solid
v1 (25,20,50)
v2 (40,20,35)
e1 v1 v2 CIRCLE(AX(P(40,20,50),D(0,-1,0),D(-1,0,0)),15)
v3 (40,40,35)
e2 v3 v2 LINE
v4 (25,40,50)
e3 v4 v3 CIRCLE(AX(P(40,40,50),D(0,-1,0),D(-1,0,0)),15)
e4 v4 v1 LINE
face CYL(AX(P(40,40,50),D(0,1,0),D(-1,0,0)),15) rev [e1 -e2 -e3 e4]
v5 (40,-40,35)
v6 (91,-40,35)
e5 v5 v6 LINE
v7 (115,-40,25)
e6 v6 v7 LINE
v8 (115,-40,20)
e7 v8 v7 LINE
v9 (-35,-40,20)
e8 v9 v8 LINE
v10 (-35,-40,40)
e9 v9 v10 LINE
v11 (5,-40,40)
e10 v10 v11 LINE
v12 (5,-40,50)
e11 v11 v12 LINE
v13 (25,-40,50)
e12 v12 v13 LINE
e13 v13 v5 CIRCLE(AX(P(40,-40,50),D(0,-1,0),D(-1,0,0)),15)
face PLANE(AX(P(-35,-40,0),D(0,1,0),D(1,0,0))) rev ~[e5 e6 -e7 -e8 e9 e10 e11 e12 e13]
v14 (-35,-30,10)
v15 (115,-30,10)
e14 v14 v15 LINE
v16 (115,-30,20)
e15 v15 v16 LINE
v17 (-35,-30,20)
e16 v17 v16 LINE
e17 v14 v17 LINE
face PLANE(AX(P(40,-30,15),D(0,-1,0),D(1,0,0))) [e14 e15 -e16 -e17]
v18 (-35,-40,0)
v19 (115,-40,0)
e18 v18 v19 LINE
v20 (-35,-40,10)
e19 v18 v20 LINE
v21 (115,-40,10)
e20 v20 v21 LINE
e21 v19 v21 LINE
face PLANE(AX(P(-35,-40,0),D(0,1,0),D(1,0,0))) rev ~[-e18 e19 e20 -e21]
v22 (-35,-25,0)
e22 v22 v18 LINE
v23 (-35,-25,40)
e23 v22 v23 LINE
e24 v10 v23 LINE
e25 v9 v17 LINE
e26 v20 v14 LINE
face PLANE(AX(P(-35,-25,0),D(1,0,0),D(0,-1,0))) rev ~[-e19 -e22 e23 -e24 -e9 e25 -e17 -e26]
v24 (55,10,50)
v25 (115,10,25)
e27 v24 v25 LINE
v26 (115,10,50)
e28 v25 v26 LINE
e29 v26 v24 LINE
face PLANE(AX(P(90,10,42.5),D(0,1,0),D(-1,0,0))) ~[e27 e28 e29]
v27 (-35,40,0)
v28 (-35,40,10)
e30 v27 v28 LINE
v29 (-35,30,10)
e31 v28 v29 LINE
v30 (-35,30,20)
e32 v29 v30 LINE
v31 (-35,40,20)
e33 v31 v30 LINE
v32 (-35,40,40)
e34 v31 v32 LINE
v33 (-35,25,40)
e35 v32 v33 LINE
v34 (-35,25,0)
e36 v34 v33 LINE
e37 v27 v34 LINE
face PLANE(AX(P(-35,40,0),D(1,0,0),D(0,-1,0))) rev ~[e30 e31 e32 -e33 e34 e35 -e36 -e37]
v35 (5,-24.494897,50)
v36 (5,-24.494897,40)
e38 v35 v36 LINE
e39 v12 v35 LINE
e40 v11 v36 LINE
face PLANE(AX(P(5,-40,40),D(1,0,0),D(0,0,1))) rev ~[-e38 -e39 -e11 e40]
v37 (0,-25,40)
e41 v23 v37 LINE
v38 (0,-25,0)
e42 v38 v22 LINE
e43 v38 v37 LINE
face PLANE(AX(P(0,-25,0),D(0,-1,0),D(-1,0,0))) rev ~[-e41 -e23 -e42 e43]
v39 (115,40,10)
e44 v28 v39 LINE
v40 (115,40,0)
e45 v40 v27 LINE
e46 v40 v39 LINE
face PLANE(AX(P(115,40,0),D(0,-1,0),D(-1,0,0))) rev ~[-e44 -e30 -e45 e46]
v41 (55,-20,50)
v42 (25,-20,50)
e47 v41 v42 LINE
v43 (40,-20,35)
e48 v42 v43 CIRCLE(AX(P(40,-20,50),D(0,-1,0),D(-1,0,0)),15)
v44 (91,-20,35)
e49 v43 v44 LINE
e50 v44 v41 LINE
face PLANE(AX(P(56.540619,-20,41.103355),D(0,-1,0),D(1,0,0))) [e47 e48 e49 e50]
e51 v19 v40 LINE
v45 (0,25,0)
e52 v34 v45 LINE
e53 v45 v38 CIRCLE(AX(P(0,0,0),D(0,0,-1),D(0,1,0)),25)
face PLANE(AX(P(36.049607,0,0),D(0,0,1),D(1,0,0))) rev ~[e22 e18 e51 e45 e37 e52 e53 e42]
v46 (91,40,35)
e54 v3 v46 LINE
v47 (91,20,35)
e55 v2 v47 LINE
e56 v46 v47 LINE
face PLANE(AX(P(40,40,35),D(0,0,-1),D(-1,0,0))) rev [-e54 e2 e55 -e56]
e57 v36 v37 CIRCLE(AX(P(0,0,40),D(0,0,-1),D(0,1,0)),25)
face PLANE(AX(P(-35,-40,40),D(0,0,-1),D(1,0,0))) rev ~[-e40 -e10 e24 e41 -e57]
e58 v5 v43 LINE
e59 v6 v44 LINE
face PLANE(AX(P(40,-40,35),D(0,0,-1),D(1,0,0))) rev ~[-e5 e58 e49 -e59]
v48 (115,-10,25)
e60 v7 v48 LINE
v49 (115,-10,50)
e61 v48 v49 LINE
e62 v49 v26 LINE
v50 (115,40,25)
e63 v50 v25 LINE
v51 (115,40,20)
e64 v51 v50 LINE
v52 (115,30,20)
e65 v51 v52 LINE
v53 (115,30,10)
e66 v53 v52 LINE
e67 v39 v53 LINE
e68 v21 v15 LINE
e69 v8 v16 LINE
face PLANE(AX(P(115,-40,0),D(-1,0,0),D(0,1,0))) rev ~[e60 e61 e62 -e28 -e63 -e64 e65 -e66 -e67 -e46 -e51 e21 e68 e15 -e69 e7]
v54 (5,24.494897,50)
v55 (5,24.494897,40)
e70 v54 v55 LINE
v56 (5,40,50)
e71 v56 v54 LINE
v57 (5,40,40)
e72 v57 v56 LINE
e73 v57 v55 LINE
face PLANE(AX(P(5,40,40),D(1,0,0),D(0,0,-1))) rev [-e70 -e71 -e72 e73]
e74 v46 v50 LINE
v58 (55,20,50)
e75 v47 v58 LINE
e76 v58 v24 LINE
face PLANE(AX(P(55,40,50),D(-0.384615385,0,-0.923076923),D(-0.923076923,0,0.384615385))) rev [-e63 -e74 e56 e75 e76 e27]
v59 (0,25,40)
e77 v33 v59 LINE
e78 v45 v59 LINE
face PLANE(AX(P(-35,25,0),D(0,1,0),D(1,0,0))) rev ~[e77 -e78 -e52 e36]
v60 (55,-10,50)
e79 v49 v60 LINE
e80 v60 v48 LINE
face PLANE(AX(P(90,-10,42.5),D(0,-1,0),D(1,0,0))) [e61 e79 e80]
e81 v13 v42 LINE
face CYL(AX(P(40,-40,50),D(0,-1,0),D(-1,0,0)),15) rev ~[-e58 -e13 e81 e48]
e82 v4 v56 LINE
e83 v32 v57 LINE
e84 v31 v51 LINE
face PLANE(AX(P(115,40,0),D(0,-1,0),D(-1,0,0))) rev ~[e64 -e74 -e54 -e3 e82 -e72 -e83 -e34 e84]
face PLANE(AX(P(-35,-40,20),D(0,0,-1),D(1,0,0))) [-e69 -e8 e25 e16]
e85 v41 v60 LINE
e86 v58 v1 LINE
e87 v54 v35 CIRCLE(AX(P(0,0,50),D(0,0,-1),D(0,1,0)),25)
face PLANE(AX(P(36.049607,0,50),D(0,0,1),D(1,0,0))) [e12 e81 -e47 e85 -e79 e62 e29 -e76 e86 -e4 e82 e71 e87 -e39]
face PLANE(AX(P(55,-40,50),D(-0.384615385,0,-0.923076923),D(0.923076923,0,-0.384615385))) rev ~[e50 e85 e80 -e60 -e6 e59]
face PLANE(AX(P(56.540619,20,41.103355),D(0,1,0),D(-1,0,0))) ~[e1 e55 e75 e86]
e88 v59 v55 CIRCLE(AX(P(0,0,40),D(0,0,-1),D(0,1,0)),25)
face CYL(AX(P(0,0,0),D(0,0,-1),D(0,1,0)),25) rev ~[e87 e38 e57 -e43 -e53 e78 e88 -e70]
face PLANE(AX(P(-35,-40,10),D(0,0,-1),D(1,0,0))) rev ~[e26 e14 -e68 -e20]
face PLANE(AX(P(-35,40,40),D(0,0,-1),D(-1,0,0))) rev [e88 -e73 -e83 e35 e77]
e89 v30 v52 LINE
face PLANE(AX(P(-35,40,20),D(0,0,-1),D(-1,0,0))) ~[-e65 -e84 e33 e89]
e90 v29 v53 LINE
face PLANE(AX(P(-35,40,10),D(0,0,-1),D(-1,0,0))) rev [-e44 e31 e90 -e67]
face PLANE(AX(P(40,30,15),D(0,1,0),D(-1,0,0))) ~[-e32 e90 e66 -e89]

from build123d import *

# Parameters (mm, degrees)
F1_DEPTH = 50
F2_W     = 40
F2_H     = 10
F3_DEPTH = 30
F2_W_2   = 150
F4_DEPTH = 10
F5_DEPTH = 20


# Not quite as in the source:
# - a pattern or mirror of a feature is missing from the dataset's text; its kind, count and spacing are read off the source's solid


with BuildPart() as f1:
    # F0 (on Top) → F1 (new body)
    with BuildSketch(Plane.XY):
        with BuildLine():
            Line((-35, -25), (-35, -40))
            Line((-35, -40), (115, -40))
            Line((115, -40), (115, 40))
            Line((115, 40), (-35, 40))
            Line((-35, 40), (-35, 25))
            Line((-35, 25), (0, 25))
            ThreePointArc((0, 25), (25, 0), (0, -25))
            Line((0, -25), (-35, -25))
        make_face()
    extrude(amount=F1_DEPTH)

    # F2 (on face) → F3 (cut)
    with BuildSketch(Plane.XZ.offset(40)):
        with Locations((-15, 45)):
            Rectangle(F2_W, F2_H)
        Polygon((115, 50), (55, 50), (91, 35), (115, 25), align=None)
    f3 = extrude(amount=-F3_DEPTH, mode=Mode.SUBTRACT)

    # F3_copies: F3 across plane
    add(f3.mirror(Plane.ZX), mode=Mode.SUBTRACT)

    # F2 (on face) → F4 (cut)
    with BuildSketch(Plane.XZ.offset(40)):
        with Locations((40, 15)):
            Rectangle(F2_W_2, F2_H)
    f4 = extrude(amount=-F4_DEPTH, mode=Mode.SUBTRACT)

    # F4_copies: F4 across plane
    add(f4.mirror(Plane.ZX), mode=Mode.SUBTRACT)

    # F2 (on face) → F5 (cut)
    with BuildSketch(Plane.XZ.offset(40)):
        with BuildLine():
            Line((55, 50), (25, 50))
            ThreePointArc((25, 50), (29.3933982822, 39.3933982822), (40, 35))
            Line((40, 35), (91, 35))
            Line((91, 35), (55, 50))
        make_face()
    f5 = extrude(amount=-F5_DEPTH, mode=Mode.SUBTRACT)

    # F5_copies: F5 across plane
    add(f5.mirror(Plane.ZX), mode=Mode.SUBTRACT)


solid = f1.part
